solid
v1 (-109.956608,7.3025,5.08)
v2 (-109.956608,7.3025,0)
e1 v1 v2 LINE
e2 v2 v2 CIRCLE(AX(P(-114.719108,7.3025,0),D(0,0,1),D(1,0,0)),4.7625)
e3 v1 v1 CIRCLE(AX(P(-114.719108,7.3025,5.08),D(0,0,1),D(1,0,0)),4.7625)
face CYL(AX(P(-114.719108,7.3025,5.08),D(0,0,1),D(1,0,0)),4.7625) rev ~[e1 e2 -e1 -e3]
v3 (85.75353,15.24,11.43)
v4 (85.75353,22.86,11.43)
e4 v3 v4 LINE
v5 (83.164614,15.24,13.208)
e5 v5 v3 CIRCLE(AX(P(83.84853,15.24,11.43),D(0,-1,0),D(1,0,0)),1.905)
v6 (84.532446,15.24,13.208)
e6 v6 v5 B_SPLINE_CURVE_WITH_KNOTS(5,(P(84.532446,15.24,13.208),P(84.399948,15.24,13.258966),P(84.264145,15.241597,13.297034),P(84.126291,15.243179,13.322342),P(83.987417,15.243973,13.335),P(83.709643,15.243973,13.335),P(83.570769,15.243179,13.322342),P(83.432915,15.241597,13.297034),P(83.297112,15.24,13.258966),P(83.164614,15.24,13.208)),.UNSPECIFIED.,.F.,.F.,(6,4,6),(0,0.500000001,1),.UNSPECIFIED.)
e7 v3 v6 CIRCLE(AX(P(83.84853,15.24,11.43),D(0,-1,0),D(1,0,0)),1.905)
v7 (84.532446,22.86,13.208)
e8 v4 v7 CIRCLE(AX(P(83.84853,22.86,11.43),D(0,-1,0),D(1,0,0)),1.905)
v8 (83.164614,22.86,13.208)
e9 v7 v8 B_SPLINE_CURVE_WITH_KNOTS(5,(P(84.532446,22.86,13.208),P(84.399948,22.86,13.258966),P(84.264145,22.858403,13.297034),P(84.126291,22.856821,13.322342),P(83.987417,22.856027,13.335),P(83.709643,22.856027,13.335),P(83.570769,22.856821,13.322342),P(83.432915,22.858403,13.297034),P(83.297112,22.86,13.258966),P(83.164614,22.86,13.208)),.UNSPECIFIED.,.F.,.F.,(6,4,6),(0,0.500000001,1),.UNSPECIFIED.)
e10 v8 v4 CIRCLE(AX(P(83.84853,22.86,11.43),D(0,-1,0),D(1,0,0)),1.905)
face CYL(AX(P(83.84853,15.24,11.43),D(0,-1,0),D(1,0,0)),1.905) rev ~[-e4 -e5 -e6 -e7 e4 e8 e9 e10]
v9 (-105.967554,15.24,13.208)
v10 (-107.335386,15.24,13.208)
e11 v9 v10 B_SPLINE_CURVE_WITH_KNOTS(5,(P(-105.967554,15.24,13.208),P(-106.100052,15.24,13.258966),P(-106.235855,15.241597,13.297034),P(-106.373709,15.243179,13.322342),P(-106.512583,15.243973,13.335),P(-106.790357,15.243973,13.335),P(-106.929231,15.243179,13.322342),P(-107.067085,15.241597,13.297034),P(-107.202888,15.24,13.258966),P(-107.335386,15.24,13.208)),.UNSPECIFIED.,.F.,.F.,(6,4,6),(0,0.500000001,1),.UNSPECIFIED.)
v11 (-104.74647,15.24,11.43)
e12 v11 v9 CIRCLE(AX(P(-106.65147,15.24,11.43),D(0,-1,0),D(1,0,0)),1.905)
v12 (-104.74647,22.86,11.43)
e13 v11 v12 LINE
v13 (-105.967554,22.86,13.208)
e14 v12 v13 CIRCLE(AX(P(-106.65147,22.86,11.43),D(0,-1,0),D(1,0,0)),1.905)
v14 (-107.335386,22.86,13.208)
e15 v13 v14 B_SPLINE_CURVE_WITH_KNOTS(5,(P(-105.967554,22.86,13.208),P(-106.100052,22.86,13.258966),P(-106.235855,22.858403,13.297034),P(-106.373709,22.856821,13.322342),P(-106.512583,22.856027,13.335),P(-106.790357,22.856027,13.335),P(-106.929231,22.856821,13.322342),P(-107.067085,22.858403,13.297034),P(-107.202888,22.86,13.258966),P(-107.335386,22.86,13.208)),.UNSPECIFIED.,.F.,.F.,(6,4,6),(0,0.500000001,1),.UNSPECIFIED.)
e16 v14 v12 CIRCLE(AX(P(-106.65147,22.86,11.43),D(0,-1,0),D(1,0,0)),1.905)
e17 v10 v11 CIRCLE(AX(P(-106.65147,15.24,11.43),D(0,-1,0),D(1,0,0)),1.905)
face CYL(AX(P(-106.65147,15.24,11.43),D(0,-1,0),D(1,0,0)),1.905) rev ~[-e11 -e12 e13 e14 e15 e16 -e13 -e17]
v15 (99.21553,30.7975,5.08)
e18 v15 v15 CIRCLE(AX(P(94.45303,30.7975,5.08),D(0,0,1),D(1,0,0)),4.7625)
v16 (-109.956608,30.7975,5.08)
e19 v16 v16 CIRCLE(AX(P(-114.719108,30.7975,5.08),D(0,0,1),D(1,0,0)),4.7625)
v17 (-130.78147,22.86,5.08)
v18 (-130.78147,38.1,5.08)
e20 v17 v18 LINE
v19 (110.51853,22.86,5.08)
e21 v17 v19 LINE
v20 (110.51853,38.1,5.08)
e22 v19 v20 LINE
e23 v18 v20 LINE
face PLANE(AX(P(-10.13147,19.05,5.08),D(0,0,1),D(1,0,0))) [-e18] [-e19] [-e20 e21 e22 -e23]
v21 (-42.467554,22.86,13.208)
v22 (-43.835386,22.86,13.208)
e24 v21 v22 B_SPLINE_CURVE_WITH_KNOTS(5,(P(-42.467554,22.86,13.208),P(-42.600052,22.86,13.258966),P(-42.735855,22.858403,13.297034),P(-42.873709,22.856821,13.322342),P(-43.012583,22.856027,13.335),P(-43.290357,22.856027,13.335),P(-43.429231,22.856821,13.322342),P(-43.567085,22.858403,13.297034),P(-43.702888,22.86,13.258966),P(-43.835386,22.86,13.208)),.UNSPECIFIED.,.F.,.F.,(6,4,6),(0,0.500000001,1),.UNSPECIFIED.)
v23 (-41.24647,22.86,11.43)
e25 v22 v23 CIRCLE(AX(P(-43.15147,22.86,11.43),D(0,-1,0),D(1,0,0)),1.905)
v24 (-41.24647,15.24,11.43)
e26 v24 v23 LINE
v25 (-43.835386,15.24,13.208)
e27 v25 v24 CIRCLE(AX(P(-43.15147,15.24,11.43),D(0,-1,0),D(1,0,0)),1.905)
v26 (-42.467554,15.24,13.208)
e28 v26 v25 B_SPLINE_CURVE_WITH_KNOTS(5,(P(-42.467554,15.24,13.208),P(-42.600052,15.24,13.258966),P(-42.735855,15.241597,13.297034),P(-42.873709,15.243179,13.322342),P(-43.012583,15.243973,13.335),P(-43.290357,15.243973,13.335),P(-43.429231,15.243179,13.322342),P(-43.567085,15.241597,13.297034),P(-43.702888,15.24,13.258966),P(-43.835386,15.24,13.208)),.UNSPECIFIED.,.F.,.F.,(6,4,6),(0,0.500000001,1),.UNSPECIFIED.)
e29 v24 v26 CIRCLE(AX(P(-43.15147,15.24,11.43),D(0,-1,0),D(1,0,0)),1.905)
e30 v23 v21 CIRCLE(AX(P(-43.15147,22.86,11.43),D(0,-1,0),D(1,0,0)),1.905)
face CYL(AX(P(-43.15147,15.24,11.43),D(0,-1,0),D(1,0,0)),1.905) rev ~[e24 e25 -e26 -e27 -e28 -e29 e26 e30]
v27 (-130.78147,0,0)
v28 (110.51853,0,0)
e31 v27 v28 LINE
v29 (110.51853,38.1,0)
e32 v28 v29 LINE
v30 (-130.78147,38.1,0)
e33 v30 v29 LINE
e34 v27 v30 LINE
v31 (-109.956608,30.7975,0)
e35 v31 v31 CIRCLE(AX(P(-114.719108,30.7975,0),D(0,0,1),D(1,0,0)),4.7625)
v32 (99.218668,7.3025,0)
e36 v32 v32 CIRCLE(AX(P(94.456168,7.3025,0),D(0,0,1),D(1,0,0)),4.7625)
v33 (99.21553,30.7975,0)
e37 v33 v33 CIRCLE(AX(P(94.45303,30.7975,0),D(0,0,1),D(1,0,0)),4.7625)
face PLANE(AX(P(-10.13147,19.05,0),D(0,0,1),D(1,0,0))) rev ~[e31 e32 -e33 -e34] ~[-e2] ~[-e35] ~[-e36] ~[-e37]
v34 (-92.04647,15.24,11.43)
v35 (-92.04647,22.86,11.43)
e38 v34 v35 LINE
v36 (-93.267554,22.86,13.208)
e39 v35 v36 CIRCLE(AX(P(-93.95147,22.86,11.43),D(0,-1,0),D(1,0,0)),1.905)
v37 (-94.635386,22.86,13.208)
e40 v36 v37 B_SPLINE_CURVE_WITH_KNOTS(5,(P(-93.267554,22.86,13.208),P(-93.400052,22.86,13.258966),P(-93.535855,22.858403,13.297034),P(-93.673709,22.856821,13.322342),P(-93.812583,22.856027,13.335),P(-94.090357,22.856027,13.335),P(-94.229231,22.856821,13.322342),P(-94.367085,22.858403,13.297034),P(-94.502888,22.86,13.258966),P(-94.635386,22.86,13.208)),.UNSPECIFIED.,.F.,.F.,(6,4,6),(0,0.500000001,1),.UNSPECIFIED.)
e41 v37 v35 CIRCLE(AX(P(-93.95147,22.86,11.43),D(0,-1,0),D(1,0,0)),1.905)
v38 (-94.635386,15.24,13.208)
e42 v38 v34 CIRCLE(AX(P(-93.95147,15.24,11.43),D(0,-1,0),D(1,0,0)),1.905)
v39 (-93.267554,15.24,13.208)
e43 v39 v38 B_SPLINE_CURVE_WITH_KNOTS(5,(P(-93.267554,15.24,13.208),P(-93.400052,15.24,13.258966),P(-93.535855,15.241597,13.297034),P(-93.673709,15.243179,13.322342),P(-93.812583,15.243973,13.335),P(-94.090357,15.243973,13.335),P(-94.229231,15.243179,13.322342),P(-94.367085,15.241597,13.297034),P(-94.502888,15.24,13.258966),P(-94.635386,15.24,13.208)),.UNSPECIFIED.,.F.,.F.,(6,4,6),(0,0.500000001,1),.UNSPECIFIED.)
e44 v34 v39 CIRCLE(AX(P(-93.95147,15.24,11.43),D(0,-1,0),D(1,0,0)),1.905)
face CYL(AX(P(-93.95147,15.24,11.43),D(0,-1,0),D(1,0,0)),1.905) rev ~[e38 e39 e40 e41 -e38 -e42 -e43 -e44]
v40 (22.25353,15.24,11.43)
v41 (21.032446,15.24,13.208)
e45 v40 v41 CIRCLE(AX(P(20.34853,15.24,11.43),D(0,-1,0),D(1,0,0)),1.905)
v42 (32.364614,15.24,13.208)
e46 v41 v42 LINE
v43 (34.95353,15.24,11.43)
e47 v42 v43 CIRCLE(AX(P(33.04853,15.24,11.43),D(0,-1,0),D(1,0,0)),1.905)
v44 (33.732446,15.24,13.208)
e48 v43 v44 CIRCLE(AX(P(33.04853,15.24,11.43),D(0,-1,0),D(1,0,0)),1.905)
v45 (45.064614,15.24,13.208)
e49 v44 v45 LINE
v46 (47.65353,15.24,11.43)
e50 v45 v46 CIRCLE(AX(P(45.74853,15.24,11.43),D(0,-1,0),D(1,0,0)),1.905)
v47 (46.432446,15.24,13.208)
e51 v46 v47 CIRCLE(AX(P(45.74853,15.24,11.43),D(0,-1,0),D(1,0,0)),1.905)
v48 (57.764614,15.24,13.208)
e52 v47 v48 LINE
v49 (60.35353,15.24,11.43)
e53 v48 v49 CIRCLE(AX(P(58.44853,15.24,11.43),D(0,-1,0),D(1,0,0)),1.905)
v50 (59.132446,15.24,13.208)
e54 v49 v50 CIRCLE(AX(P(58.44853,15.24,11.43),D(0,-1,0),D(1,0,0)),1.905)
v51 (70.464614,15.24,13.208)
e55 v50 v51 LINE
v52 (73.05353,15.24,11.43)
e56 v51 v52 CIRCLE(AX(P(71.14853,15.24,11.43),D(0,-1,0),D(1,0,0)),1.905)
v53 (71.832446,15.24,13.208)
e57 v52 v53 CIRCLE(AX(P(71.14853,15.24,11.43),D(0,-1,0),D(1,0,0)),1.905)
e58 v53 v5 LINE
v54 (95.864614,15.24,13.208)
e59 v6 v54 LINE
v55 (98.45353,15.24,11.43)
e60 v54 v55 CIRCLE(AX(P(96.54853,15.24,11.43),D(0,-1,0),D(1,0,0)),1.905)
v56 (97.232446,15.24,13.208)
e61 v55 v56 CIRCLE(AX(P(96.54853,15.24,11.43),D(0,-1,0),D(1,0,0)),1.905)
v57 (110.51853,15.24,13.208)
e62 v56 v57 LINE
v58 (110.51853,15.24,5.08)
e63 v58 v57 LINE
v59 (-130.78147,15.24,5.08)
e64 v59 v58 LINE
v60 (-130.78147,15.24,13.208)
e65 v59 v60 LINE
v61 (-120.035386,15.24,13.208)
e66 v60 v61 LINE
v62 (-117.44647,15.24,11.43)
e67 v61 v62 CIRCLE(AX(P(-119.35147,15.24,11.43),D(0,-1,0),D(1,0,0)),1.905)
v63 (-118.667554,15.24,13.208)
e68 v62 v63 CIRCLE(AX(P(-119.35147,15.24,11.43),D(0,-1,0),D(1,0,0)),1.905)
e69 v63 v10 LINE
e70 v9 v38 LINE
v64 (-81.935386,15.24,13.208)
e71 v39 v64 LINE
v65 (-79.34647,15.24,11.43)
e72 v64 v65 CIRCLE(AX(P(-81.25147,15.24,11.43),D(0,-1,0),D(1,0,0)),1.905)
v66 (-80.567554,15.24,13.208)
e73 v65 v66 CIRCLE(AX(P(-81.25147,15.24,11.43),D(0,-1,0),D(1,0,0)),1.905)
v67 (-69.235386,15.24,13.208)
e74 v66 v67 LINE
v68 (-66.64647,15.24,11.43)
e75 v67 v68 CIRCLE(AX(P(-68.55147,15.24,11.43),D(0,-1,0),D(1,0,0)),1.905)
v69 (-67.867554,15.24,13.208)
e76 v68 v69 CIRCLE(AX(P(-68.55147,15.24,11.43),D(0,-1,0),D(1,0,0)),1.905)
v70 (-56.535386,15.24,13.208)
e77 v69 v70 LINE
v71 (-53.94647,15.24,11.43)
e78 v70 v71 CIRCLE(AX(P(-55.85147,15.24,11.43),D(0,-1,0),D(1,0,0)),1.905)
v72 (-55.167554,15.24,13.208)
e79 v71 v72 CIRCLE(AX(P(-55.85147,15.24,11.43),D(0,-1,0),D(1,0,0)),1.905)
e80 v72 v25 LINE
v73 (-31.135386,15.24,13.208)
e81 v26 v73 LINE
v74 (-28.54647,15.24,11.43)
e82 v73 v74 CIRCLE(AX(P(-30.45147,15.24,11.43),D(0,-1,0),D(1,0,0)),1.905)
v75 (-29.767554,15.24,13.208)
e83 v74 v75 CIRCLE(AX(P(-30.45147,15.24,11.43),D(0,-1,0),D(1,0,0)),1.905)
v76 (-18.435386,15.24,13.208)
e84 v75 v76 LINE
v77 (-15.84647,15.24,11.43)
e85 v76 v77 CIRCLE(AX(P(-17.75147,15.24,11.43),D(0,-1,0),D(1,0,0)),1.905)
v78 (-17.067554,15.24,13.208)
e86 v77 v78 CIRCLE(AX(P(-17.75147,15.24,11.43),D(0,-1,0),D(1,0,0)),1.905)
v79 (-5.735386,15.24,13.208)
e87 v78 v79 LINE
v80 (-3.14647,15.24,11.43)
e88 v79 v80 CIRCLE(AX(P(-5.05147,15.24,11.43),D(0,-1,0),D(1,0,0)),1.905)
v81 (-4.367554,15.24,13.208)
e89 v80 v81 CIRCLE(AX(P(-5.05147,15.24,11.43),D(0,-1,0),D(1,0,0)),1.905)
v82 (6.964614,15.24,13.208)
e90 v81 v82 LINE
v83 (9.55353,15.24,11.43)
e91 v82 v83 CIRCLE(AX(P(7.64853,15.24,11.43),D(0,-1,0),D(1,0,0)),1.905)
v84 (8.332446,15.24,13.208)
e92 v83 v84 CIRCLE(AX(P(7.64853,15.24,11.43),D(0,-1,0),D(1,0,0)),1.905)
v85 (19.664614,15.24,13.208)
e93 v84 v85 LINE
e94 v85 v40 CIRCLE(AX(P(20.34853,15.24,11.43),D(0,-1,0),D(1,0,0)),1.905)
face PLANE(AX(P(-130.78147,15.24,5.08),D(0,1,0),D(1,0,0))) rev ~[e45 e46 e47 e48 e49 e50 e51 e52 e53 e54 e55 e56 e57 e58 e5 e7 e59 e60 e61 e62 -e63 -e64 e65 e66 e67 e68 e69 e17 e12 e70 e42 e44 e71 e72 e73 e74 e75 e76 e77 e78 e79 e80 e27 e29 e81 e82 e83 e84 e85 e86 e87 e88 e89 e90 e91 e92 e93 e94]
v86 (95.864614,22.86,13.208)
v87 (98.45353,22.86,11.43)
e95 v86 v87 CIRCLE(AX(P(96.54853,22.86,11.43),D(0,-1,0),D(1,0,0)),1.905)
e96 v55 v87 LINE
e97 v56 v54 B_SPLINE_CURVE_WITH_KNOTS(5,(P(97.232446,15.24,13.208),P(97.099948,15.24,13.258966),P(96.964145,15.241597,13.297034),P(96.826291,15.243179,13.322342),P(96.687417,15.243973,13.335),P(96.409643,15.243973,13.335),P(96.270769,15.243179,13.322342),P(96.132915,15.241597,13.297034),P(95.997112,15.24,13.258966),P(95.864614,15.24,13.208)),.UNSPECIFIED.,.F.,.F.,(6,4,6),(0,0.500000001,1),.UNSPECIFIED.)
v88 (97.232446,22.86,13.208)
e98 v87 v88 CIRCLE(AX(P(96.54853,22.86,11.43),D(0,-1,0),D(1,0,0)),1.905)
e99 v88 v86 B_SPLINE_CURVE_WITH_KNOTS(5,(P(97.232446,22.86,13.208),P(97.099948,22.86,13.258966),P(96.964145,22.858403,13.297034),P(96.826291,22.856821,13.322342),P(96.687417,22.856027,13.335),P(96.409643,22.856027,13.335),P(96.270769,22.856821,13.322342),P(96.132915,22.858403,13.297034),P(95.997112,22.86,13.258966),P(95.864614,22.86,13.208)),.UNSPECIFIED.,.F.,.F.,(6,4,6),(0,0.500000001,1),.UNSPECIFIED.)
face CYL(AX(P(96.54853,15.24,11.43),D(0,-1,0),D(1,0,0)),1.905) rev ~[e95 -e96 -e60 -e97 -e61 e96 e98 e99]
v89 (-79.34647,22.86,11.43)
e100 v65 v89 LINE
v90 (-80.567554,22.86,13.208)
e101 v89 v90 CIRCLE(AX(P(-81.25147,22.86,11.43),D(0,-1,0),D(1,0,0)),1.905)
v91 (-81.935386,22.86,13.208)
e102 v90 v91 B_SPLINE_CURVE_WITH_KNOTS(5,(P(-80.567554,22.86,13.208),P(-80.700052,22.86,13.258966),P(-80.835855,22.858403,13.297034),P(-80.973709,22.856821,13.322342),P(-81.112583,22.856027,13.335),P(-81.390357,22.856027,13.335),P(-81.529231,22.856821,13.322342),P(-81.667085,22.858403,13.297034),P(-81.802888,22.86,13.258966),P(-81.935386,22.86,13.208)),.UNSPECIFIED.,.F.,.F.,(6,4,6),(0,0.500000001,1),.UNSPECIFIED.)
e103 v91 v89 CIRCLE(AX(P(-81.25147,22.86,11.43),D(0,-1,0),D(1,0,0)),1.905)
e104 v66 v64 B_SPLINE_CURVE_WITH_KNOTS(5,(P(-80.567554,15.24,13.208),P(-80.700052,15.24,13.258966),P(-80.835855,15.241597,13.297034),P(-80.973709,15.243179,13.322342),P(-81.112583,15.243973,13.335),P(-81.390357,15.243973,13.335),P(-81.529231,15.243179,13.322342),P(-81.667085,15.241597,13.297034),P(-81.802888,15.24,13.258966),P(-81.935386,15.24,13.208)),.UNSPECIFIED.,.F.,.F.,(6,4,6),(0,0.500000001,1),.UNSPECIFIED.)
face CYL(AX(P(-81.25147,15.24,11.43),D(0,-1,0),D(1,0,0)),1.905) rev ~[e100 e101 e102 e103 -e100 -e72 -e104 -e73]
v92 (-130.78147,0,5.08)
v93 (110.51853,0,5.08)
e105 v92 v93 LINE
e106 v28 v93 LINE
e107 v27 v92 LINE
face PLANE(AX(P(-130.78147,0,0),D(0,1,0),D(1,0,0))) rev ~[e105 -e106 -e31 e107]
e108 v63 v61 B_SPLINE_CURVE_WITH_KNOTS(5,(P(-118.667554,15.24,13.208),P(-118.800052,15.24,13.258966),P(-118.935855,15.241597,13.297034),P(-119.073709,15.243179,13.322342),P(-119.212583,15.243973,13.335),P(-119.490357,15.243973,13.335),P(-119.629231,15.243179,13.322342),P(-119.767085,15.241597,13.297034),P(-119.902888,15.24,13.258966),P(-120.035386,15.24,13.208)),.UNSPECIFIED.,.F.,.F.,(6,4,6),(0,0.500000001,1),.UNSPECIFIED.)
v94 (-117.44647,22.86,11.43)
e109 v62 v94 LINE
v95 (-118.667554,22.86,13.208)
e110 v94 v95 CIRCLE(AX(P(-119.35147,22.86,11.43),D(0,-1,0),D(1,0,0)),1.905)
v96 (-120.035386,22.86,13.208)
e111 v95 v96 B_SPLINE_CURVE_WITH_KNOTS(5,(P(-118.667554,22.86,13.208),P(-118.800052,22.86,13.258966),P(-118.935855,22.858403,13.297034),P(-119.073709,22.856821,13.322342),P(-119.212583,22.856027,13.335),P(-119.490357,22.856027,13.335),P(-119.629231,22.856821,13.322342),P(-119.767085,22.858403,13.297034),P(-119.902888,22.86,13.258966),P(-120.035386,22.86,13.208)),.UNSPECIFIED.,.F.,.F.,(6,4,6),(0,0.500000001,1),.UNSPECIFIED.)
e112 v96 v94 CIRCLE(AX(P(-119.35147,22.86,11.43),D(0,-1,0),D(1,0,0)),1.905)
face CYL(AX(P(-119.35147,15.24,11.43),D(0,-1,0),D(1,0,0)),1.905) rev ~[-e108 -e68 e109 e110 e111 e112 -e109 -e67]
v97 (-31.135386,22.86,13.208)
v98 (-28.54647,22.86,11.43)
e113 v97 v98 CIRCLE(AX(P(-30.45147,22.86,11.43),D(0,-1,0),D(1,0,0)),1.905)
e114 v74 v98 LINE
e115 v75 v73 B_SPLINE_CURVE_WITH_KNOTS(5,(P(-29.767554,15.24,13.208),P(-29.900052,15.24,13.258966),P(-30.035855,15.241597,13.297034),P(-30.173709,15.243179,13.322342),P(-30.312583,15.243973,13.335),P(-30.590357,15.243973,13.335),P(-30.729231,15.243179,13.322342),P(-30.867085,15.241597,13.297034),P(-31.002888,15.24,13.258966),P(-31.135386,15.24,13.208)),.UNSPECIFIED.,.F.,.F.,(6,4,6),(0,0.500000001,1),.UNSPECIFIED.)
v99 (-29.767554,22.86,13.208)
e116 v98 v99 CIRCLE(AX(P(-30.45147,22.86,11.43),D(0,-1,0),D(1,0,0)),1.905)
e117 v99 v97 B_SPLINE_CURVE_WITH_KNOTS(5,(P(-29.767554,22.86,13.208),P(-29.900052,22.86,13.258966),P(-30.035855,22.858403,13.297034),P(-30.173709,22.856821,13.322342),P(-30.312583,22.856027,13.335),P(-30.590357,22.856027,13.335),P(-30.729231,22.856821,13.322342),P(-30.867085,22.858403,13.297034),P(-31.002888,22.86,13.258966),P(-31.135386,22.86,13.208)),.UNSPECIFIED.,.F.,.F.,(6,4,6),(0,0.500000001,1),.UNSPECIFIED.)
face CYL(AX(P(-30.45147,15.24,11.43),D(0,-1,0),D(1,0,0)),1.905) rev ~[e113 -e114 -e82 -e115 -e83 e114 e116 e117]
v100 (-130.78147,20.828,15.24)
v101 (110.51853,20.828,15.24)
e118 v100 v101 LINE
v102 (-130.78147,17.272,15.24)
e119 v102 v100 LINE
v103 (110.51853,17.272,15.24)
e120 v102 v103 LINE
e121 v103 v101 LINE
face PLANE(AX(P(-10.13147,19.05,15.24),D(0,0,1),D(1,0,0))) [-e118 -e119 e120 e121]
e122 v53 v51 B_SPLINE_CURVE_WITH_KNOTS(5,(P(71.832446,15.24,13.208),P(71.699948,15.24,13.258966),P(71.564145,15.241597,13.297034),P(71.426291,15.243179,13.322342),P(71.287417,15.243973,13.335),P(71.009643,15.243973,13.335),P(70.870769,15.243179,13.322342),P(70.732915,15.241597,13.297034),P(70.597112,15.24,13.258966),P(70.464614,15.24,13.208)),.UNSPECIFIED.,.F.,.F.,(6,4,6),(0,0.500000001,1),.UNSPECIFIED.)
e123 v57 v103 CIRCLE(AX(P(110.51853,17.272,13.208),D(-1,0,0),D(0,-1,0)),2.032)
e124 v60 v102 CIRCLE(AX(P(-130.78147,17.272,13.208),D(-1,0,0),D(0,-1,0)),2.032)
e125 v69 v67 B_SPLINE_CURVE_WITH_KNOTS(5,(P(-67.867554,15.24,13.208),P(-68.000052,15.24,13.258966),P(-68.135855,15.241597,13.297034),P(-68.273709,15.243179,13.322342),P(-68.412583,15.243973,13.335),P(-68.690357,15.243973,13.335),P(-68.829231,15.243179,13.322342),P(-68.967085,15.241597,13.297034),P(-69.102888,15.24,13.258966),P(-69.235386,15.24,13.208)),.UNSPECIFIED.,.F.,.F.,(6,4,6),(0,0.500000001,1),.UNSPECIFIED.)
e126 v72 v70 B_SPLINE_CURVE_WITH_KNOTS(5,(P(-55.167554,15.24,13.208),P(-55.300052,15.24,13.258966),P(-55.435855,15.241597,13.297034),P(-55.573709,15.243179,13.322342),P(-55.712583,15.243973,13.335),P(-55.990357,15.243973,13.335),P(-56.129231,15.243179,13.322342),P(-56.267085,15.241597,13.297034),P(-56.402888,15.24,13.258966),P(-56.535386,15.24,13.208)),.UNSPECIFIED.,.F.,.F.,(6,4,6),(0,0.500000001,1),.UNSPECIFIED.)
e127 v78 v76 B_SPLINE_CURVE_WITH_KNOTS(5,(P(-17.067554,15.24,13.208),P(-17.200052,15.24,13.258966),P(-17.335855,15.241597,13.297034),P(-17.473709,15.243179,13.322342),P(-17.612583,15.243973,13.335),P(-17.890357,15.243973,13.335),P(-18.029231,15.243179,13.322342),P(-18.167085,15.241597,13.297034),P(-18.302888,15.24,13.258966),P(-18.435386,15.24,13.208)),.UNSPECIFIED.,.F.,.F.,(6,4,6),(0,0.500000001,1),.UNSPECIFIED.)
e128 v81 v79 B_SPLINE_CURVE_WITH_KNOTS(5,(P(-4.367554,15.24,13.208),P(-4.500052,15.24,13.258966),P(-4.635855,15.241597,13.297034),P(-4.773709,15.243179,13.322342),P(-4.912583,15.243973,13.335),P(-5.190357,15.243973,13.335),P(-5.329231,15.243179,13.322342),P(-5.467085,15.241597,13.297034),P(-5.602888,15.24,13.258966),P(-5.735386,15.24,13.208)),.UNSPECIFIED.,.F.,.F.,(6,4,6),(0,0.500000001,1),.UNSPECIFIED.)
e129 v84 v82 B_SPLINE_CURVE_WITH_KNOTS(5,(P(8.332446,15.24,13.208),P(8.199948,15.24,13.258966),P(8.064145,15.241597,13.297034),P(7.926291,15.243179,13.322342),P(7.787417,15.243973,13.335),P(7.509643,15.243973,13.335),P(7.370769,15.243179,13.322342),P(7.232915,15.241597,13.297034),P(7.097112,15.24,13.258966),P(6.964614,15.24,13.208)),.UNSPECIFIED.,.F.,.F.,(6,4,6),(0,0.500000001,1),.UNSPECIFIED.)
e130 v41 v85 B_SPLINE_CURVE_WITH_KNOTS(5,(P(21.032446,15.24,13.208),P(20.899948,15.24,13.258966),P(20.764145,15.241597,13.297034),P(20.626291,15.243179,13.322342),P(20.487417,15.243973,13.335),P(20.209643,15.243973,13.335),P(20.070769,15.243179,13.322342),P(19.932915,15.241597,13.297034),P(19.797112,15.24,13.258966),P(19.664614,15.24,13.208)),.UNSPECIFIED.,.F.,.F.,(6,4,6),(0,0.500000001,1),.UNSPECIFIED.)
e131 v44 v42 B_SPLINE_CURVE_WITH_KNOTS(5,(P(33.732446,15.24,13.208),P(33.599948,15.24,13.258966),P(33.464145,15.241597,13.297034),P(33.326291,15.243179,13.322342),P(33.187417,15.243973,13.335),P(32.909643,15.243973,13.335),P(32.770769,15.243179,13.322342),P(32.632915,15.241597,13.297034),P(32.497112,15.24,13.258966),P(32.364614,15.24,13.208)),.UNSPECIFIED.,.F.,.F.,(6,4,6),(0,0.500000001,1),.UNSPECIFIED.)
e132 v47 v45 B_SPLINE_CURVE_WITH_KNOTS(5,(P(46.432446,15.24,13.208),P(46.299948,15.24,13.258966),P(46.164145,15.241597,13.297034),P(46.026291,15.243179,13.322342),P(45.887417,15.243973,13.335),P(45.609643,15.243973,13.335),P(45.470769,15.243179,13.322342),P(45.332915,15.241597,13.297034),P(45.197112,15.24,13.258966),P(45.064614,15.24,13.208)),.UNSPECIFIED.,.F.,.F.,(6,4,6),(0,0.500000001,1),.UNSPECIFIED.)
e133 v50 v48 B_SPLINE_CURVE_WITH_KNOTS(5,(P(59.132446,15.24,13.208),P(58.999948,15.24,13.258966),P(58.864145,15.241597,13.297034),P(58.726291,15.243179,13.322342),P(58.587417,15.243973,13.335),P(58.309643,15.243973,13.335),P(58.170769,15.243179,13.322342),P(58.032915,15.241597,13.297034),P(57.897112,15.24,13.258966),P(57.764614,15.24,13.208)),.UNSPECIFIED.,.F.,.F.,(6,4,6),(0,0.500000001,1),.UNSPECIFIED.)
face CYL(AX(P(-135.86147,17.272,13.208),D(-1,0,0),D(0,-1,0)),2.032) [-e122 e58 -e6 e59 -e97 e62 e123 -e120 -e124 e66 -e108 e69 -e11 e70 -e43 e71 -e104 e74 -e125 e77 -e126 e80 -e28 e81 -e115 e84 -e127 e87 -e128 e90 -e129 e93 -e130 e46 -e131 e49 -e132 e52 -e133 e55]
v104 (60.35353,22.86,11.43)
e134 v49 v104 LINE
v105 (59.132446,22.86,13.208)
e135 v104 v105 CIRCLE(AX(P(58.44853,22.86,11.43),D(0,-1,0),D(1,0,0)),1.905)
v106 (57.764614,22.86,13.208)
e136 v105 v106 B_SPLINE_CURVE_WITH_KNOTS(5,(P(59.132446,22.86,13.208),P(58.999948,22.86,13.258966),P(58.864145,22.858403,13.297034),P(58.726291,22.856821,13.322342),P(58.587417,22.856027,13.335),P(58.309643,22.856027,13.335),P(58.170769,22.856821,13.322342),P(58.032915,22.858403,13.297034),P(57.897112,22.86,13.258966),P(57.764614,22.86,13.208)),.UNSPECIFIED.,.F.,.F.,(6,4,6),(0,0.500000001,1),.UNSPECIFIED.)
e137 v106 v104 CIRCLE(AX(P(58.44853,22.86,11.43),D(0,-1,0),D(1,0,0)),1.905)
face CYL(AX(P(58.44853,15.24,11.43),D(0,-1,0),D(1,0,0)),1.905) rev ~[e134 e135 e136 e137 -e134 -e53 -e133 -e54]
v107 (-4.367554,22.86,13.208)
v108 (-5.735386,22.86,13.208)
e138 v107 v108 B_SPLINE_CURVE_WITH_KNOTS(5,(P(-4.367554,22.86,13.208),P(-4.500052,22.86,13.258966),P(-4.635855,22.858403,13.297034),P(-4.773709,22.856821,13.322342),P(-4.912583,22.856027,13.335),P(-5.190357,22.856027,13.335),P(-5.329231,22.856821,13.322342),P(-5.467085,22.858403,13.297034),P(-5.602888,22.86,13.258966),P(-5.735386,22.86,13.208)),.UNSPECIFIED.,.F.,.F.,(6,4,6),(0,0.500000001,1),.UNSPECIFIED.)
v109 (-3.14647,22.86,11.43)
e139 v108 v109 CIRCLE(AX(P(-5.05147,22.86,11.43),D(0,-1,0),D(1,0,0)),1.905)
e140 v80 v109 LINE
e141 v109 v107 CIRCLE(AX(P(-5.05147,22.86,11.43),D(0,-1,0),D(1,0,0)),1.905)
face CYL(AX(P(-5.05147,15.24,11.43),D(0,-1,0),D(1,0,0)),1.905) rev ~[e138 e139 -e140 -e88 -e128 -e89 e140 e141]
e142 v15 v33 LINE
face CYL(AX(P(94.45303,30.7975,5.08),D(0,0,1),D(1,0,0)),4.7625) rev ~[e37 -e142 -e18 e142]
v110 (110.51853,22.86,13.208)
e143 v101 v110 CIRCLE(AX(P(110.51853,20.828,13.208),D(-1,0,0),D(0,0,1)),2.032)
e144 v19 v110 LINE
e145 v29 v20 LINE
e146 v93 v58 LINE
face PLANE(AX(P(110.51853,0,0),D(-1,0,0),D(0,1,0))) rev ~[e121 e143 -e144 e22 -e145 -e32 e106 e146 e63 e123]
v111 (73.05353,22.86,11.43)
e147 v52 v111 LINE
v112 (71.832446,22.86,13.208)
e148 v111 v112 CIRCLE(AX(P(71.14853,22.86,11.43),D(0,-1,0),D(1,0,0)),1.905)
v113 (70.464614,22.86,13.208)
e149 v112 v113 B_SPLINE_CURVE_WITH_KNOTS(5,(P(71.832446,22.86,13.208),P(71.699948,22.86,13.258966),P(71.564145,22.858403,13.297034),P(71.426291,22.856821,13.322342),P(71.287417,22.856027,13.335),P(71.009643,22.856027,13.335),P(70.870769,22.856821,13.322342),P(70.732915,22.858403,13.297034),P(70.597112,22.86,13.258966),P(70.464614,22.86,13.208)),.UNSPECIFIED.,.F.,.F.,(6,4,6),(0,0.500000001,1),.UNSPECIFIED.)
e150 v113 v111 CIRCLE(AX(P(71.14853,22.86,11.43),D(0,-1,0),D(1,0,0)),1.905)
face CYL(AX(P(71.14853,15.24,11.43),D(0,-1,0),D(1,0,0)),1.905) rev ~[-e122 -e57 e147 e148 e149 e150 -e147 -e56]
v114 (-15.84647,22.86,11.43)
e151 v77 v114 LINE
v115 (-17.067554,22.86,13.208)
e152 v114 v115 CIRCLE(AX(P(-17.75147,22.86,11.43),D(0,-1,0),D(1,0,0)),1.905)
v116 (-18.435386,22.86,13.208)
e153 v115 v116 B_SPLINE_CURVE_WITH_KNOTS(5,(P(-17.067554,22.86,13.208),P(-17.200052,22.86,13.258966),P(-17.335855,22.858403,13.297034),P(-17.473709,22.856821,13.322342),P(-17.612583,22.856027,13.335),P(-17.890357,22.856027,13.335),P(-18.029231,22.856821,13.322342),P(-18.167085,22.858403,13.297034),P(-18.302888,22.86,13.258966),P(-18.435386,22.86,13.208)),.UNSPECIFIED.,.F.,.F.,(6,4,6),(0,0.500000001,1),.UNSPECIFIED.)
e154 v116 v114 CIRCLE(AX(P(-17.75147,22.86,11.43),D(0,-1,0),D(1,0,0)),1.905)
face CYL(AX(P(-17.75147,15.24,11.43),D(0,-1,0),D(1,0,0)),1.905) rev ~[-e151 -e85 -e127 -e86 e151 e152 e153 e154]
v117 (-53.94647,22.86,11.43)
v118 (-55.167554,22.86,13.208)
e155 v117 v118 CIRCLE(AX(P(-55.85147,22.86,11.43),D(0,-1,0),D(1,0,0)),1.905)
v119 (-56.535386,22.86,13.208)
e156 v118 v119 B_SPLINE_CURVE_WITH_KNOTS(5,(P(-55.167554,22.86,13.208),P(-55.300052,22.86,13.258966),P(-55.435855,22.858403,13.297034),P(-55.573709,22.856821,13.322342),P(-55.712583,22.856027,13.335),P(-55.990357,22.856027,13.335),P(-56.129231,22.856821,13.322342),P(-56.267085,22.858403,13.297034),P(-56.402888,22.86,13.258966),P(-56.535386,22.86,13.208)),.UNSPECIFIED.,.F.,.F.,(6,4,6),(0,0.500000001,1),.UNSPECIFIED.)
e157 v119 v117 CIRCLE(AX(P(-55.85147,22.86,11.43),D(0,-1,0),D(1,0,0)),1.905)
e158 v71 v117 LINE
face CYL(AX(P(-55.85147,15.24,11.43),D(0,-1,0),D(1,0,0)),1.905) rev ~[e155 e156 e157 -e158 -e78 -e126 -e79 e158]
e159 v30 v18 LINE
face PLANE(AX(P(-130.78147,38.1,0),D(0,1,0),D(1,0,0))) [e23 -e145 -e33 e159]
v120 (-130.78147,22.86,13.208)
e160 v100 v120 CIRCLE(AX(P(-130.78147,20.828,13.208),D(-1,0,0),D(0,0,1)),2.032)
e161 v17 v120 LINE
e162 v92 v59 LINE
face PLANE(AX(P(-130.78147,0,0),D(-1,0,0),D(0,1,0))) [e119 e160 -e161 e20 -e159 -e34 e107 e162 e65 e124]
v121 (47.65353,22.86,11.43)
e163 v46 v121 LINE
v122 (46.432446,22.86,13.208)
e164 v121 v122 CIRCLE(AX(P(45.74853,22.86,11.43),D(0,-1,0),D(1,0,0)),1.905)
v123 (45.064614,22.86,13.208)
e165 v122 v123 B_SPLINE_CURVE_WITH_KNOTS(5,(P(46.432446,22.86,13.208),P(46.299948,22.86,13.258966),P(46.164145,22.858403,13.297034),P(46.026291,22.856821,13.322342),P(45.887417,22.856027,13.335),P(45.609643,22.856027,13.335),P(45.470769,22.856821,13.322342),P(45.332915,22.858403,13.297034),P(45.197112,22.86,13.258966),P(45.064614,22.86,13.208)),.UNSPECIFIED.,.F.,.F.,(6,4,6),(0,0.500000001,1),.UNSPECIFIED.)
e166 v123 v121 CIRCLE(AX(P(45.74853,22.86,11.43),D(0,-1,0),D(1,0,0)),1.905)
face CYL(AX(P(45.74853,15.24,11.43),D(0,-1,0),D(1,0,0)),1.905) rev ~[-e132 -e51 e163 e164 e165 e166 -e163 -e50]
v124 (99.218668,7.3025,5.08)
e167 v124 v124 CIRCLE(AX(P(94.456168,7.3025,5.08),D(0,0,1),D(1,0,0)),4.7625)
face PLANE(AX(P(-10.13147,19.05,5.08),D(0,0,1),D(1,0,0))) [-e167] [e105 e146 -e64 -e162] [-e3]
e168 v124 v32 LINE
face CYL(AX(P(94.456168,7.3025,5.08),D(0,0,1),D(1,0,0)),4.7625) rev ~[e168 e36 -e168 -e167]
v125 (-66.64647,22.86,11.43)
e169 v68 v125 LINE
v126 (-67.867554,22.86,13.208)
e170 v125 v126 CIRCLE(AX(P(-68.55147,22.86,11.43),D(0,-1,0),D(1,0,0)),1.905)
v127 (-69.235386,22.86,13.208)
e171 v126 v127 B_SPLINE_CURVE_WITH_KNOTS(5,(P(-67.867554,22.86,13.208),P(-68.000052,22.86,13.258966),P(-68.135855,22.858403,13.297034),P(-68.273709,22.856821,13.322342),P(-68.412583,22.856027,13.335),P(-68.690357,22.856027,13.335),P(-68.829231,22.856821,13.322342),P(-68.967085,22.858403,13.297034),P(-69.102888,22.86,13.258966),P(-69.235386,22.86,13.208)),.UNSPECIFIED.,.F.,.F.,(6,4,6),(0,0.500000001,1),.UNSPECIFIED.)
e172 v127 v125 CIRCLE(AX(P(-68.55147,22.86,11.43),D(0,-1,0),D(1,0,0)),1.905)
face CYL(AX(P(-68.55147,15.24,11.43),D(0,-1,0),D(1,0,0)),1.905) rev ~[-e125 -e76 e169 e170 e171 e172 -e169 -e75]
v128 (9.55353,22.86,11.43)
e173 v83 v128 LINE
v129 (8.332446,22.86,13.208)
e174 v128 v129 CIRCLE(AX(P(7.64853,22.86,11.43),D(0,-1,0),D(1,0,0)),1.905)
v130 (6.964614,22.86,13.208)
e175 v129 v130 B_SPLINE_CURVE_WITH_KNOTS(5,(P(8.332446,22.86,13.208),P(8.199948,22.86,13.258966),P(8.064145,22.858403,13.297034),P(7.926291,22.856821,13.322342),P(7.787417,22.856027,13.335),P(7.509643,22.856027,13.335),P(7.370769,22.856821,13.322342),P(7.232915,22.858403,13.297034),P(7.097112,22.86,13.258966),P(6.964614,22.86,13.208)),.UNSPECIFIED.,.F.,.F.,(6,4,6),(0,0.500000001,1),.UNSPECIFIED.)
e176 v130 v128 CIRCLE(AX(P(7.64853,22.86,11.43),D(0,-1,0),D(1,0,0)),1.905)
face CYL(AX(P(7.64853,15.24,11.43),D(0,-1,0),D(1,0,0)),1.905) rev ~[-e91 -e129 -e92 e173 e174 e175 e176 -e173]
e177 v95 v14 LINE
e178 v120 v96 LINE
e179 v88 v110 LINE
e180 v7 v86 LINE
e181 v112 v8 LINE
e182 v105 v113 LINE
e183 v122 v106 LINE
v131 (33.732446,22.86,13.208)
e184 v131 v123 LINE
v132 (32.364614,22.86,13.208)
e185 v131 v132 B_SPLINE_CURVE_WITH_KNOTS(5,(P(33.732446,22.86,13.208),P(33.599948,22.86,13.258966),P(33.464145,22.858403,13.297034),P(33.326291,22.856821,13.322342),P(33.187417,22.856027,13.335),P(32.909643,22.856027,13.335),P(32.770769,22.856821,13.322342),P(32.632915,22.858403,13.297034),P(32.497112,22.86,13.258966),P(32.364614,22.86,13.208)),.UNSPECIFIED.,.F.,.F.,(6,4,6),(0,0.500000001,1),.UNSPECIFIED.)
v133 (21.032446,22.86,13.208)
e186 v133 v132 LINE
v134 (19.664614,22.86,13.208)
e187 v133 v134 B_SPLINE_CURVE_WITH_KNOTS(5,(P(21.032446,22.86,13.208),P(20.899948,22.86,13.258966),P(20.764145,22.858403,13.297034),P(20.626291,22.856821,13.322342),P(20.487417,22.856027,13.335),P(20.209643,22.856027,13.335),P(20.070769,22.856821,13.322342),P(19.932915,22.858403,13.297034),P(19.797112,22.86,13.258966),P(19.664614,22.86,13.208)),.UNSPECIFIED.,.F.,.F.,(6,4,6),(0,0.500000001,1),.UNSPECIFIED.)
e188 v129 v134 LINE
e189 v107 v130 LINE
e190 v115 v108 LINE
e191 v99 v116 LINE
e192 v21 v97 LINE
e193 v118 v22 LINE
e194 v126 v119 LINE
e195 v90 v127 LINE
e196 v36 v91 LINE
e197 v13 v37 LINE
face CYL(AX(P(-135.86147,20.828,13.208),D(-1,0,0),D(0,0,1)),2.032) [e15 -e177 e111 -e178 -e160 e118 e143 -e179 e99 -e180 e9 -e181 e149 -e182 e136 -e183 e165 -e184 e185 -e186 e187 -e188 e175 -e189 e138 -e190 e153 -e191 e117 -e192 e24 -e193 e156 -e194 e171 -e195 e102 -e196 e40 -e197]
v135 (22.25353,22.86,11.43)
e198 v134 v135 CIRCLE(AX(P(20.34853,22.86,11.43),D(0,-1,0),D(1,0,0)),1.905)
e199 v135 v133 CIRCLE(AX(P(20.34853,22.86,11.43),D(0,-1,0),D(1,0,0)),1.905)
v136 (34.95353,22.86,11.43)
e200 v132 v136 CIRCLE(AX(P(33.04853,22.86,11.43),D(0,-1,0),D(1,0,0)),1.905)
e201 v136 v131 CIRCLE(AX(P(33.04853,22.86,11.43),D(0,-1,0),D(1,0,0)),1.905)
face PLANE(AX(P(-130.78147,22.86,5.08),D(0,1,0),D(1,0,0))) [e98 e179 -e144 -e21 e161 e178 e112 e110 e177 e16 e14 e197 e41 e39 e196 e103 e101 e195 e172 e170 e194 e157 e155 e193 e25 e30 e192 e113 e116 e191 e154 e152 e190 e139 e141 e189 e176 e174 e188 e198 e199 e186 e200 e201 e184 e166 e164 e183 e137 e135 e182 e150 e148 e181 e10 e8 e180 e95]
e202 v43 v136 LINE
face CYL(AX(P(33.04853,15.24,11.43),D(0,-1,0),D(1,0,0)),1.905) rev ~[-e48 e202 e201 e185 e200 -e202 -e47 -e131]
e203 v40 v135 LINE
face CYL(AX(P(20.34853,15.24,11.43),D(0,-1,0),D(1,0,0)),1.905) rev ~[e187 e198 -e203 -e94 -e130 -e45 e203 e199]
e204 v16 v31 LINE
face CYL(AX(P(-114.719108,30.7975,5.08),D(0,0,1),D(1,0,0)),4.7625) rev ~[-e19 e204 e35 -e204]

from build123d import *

# Parameters (mm, degrees)
F0_W        = 241.3
F0_H        = 38.1
F1_DEPTH    = 5.08
F2_W        = 241.3
F2_H        = 7.62
F3_DEPTH    = 10.16
F4_R        = 1.905
F5_DEPTH    = 22.861
F6_R        = 4.7625
F7_R        = 4.7625
F8_DEPTH    = 5.081
F9_T1_DEPTH = 251.46


# Not quite as in the source:
# - a fillet or chamfer that OpenCascade refuses, or shapes differently, is made with other operations: its cross-section is extruded or revolved along the edge and cut away or added


with BuildPart() as f1:
    # F0 (on Top) → F1 (new body)
    with BuildSketch(Plane.XY):
        with Locations((-10.1314700298, 19.05)):
            Rectangle(F0_W, F0_H)
    extrude(amount=F1_DEPTH)

    # F2 (on face) → F3 (join)
    with BuildSketch(Plane.XY.offset(5.08)):
        with Locations((-10.1314700298, 19.05)):
            Rectangle(F2_W, F2_H)
    extrude(amount=F3_DEPTH)

    # F4 (on face) → F5 (cut, through all)
    with BuildSketch(Plane.XZ.offset(-15.24)):
        with Locations((-119.3514700298, 11.43)):
            Circle(F4_R)
        with Locations((-106.6514700298, 11.43)):
            Circle(F4_R)
        with Locations((-93.9514700298, 11.43)):
            Circle(F4_R)
        with Locations((-81.2514700298, 11.43)):
            Circle(F4_R)
        with Locations((-68.5514700298, 11.43)):
            Circle(F4_R)
        with Locations((-55.8514700298, 11.43)):
            Circle(F4_R)
        with Locations((-43.1514700298, 11.43)):
            Circle(F4_R)
        with Locations((-30.4514700298, 11.43)):
            Circle(F4_R)
        with Locations((-17.7514700298, 11.43)):
            Circle(F4_R)
        with Locations((-5.0514700298, 11.43)):
            Circle(F4_R)
        with Locations((7.6485299702, 11.43)):
            Circle(F4_R)
        with Locations((20.3485299702, 11.43)):
            Circle(F4_R)
        with Locations((33.0485299702, 11.43)):
            Circle(F4_R)
        with Locations((45.7485299702, 11.43)):
            Circle(F4_R)
        with Locations((58.4485299702, 11.43)):
            Circle(F4_R)
        with Locations((71.1485299702, 11.43)):
            Circle(F4_R)
        with Locations((83.8485299702, 11.43)):
            Circle(F4_R)
        with Locations((96.5485299702, 11.43)):
            Circle(F4_R)
    extrude(amount=-F5_DEPTH, mode=Mode.SUBTRACT)

    # F6 (on face) + F7 (on face) → F8 (cut, through all)
    with BuildSketch(Plane.XY.offset(5.08)):
        with Locations((-114.719107688, 30.7975)):
            Circle(F6_R)
        with Locations((94.4530299702, 30.7975)):
            Circle(F6_R)
    with BuildSketch(Plane.XY.offset(5.08)):
        with Locations((-114.719107688, 7.3025)):
            Circle(F7_R)
        with Locations((94.4561676284, 7.3025)):
            Circle(F7_R)
    extrude(amount=-F8_DEPTH, mode=Mode.SUBTRACT)

    # F9: fillet of radius 2.032 on 2 edges, made by hand

    # F9_s2 → F9_t1 (cut)
    with BuildSketch(Plane.YZ.offset(-135.8614700298)):
        with BuildLine():
            ThreePointArc((15.24, 13.208), (15.8351590206, 14.6448409794), (17.272, 15.24))
            Line((17.272, 15.24), (15.24, 15.24))
            Line((15.24, 15.24), (15.24, 13.208))
        make_face()
        with BuildLine():
            ThreePointArc((20.828, 15.24), (22.2648409794, 14.6448409794), (22.86, 13.208))
            Line((22.86, 13.208), (22.86, 15.24))
            Line((22.86, 15.24), (20.828, 15.24))
        make_face()
    extrude(amount=F9_T1_DEPTH, mode=Mode.SUBTRACT)


solid = f1.part
